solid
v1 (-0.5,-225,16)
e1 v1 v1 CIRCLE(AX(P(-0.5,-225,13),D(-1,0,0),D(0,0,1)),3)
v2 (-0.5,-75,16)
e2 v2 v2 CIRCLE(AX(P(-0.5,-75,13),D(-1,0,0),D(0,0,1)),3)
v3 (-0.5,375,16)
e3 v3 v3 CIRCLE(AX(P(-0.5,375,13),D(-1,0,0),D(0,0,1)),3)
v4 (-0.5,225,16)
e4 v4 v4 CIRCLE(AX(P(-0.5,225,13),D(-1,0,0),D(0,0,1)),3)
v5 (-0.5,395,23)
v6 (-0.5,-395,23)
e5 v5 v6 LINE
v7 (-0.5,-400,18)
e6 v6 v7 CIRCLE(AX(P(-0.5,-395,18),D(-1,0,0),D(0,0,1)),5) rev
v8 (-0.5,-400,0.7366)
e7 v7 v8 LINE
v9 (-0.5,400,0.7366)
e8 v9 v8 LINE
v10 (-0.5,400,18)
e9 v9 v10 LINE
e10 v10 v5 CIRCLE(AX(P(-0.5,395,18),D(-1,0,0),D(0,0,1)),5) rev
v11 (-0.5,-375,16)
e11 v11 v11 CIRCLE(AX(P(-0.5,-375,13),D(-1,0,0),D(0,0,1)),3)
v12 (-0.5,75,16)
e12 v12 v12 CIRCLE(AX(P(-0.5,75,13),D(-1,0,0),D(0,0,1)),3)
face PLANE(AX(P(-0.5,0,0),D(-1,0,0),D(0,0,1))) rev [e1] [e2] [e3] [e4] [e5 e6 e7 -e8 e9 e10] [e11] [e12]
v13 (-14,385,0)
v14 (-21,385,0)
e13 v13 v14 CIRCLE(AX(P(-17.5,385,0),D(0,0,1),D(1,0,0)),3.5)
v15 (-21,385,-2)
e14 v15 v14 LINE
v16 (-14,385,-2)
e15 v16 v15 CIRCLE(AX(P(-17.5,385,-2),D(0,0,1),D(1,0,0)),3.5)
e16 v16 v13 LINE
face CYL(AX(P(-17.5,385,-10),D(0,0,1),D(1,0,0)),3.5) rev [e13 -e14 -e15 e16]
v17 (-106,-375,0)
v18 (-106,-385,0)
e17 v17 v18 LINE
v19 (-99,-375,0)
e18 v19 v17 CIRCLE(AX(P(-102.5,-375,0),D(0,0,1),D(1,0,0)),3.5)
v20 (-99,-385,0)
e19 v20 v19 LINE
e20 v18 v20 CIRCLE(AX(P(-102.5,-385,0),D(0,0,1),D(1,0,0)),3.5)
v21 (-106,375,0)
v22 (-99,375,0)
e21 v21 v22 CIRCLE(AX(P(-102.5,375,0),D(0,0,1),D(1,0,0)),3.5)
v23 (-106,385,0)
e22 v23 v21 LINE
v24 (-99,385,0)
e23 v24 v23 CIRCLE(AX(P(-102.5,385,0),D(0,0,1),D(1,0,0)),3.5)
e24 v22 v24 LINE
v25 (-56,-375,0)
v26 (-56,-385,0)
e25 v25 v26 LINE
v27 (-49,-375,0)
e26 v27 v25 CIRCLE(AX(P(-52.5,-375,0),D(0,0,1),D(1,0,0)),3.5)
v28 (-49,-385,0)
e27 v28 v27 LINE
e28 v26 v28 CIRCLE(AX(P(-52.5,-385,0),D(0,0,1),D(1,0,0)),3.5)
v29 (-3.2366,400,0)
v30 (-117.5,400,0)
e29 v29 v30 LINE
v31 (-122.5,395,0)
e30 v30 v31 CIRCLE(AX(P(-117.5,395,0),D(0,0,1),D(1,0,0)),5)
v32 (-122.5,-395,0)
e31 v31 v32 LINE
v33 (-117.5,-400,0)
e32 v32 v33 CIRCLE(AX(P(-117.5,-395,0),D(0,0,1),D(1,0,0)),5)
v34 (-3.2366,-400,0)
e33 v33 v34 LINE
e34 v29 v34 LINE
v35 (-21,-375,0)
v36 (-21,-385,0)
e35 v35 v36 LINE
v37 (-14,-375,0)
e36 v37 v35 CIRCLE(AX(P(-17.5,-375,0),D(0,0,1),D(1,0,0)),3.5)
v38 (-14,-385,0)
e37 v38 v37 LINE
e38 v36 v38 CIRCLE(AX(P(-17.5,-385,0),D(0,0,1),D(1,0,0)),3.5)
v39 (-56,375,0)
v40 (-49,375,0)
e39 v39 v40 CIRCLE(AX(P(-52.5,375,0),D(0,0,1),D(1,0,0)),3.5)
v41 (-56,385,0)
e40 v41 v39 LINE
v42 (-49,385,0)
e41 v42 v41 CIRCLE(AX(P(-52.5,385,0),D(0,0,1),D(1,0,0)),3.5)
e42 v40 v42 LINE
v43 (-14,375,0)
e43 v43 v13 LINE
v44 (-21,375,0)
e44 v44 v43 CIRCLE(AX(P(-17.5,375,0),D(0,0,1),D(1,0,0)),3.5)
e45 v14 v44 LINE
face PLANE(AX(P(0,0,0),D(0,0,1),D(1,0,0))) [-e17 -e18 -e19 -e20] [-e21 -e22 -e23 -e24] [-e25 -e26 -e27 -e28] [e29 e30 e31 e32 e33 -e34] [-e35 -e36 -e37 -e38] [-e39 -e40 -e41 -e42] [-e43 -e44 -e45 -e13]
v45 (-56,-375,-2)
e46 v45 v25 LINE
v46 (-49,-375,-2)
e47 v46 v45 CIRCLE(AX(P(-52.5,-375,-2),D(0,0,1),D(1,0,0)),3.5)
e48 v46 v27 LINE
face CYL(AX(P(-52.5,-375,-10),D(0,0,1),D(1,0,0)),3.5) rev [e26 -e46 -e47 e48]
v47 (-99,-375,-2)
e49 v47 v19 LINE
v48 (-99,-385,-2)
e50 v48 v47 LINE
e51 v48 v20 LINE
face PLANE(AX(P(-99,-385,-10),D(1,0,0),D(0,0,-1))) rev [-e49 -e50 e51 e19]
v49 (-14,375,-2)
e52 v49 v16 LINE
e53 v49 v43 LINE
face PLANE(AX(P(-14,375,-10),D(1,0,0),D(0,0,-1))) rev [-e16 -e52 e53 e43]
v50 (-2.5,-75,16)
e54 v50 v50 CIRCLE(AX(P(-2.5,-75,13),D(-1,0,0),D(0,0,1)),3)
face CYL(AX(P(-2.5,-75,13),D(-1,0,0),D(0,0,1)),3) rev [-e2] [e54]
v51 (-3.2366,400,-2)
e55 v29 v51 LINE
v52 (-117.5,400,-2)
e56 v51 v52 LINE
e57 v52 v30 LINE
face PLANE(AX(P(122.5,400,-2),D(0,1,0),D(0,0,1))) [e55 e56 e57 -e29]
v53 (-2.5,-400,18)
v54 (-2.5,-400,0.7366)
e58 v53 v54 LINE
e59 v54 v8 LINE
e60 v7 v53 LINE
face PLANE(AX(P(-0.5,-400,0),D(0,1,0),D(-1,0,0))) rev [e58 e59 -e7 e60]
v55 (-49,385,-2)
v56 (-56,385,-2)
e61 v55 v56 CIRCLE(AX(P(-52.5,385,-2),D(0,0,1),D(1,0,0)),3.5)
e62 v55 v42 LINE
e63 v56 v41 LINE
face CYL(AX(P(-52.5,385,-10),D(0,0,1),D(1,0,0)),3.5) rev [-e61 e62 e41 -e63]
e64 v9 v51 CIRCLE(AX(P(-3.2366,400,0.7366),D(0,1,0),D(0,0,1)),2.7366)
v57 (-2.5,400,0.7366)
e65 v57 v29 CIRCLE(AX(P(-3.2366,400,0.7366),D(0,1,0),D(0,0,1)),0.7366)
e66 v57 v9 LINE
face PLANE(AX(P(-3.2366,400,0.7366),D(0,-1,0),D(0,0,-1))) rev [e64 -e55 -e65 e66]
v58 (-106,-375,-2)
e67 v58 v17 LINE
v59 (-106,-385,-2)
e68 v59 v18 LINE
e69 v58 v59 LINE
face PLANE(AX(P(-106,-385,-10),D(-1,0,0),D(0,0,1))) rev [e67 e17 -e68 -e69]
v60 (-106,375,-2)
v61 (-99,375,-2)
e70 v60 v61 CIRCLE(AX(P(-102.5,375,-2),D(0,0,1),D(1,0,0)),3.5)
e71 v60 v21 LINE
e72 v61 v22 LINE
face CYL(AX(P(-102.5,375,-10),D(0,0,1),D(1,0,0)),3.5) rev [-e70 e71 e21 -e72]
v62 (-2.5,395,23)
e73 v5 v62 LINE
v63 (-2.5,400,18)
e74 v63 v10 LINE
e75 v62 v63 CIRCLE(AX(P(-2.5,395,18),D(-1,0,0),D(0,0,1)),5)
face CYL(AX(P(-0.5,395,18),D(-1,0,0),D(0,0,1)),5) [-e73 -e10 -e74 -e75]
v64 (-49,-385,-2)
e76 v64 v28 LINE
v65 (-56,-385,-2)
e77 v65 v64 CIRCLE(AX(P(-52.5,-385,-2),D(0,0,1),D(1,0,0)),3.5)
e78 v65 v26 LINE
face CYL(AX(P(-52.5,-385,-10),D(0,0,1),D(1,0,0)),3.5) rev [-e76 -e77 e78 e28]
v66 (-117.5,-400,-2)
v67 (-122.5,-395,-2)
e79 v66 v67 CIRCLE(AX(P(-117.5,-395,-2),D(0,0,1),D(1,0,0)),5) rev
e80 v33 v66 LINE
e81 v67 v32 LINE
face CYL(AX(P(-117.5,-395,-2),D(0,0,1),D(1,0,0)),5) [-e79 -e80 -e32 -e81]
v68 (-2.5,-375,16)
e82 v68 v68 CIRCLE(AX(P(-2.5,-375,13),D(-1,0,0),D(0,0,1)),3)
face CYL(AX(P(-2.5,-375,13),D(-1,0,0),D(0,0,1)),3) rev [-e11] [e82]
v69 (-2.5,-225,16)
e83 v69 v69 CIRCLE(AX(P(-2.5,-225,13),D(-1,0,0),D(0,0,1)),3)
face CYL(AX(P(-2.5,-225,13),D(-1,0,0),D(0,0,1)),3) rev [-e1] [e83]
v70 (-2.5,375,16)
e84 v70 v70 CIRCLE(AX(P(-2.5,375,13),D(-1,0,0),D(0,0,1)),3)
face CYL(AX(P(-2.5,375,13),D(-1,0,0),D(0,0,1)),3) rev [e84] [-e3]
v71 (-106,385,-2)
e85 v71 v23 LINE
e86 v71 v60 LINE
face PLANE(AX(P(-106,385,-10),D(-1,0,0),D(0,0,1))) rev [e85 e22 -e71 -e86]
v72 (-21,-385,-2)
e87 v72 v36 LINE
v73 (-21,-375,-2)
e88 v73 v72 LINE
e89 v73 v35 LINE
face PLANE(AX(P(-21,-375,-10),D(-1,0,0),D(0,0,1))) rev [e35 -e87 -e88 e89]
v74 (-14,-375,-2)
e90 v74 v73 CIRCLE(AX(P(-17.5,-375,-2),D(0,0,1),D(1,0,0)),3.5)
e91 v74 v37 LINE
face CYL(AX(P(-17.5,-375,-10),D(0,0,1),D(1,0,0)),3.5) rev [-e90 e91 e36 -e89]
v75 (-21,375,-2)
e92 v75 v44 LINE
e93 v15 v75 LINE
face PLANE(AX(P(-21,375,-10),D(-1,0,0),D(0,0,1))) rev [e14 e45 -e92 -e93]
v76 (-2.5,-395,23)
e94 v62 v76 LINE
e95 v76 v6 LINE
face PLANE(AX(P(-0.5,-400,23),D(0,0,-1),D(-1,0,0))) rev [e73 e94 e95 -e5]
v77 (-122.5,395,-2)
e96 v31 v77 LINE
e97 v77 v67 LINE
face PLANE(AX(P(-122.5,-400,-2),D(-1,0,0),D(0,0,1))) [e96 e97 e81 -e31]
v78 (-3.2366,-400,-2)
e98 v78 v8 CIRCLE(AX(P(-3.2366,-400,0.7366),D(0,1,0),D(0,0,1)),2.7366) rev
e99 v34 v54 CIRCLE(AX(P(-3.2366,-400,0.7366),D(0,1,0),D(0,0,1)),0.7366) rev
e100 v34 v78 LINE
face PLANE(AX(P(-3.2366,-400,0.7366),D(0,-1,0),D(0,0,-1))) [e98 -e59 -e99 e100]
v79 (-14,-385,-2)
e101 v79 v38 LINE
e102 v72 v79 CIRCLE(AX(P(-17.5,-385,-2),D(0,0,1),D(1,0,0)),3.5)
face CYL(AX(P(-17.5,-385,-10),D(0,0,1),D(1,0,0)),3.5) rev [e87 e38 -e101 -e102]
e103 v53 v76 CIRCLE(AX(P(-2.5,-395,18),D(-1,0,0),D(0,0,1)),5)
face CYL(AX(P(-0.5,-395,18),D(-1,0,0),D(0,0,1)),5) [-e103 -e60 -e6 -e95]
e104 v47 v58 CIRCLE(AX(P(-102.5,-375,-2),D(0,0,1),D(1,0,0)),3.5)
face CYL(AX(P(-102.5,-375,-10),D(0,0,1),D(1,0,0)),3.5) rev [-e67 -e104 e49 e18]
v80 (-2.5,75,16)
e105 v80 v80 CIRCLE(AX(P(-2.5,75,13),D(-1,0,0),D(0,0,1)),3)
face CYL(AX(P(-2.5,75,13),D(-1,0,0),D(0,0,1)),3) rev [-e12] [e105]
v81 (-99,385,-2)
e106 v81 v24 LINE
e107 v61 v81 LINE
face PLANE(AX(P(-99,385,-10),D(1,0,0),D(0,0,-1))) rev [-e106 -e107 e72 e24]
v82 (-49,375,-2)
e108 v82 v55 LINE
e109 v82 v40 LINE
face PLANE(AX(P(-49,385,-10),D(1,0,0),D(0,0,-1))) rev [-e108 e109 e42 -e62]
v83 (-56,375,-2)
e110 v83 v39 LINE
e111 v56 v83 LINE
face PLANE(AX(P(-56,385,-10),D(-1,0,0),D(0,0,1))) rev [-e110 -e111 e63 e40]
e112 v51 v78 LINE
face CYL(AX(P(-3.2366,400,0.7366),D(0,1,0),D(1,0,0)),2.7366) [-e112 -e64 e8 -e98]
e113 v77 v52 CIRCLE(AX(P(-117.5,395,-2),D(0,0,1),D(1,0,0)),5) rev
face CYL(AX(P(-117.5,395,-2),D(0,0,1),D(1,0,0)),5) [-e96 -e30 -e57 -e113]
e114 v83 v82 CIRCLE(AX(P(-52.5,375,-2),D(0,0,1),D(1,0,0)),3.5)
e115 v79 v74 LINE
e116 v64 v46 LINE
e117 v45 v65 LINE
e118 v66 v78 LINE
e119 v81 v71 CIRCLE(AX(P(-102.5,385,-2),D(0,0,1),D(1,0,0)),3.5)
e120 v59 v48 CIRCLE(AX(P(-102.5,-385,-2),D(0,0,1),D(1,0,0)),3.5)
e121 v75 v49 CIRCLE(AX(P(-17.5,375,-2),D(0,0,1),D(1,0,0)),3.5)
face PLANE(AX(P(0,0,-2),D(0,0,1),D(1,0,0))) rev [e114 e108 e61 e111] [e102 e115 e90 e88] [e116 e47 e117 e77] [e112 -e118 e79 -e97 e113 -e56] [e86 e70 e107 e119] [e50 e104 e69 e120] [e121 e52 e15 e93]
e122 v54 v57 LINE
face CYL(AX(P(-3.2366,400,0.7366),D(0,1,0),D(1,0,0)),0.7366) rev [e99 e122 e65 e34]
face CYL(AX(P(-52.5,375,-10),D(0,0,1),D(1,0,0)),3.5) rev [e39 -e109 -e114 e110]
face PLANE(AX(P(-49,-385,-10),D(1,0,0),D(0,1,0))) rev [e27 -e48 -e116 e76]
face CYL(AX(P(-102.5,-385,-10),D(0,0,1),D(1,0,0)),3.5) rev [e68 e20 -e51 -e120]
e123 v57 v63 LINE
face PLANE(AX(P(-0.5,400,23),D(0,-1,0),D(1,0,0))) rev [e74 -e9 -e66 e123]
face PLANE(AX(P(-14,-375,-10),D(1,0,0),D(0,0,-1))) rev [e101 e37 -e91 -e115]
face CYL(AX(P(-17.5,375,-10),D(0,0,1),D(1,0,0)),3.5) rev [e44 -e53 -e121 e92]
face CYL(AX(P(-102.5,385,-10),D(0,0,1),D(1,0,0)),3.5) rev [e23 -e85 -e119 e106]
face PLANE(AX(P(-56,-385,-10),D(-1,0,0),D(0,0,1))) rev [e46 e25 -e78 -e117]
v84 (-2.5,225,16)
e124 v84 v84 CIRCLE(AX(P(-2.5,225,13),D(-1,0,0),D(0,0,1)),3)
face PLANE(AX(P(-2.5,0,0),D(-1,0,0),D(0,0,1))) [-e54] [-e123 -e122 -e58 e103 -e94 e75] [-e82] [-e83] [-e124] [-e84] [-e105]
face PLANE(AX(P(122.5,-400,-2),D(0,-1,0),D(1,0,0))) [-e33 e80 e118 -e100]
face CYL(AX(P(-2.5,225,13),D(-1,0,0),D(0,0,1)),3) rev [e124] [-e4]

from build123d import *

# Parameters (mm, degrees)
SKETCH_1_W                       = 245
SKETCH_1_H                       = 800
SM_BASE_FLANGE_1_DEPTH           = 2
FILLET_1_R                       = 5
SKETCH_2_W                       = 1
SKETCH_2_H                       = 854.013811654
CUT_EXTRUDE_1_DEPTH              = 10
SKETCH_3_W                       = 130
SKETCH_3_H                       = 800.320249097
CUT_EXTRUDE_2_DEPTH              = 10
SM_EDGE_FLANGE_1_STRIP_W         = 9.4732
SM_EDGE_FLANGE_1_STRIP_H         = 2
SM_EDGE_FLANGE_1_STRIP_CUT_DEPTH = 800
SM_EDGE_FLANGE_1_DEPTH           = 800
FILLET_2_R                       = 5
CUT_EXTRUDE_3_DEPTH              = 10
HOLE_WIZARD_6_0_6_1_D            = 6
PATTERN_LINEAR_1_COUNT           = 6
PATTERN_LINEAR_1_PITCH           = 150


# Sheet-metal steps are written as plain solids
with BuildPart() as part:
    # Sketch 1 → 基体-法兰1 (new body)
    with BuildSketch(Plane.XY):
        Rectangle(SKETCH_1_W, SKETCH_1_H)
    extrude(amount=-SM_BASE_FLANGE_1_DEPTH)

    # 圆角1
    fillet_1_edges = [part.edges().sort_by_distance(p)[0] for p in [
        (-122.5, 400, -1),
        (122.5, 400, -1),
        (122.5, -400, -1),
        (-122.5, -400, -1),
    ]]
    fillet(fillet_1_edges, radius=FILLET_1_R)

    # Sketch 2 → 切除-拉伸1 (cut)
    with BuildSketch(Plane.XY):
        Rectangle(SKETCH_2_W, SKETCH_2_H)
    extrude(amount=-CUT_EXTRUDE_1_DEPTH, mode=Mode.SUBTRACT)


with BuildPart() as cut_extrude_1_piece_1:
    # of the separate pieces the step leaves, piece 1, a body of its own (cut_extrude_1_pieces)
    add(part.part.solids().sort_by_distance((-0.5, -400, 0))[0])

    # 边线-法兰1 strip (across the edge) → 边线-法兰1 strip cut (cut)
    with BuildSketch(Plane(origin=(-0.5, -400, 0), x_dir=(-1, 0, 0), z_dir=(0, 1, 0))):
        with Locations((-2, -1)):
            Rectangle(SM_EDGE_FLANGE_1_STRIP_W, SM_EDGE_FLANGE_1_STRIP_H)
    extrude(amount=SM_EDGE_FLANGE_1_STRIP_CUT_DEPTH, mode=Mode.SUBTRACT)

    # 边线-法兰1 section (across the edge) → 边线-法兰1 (add)
    with BuildSketch(Plane(origin=(-0.5, -400, 0), x_dir=(-1, 0, 0), z_dir=(0, 1, 0))):
        with BuildLine():
            Line((0, 0.7366), (0, 23))
            Line((0, 23), (2, 23))
            Line((2, 23), (2, 0.7366))
            ThreePointArc((2, 0.7366), (2.215745145, 0.215745145), (2.7366, 0))
            Line((2.7366, 0), (2.7366, -2))
            ThreePointArc((2.7366, -2), (0.801531583, -1.198468417), (0, 0.7366))
        make_face()
    extrude(amount=SM_EDGE_FLANGE_1_DEPTH)

    # 圆角2
    fillet_2_edges = [cut_extrude_1_piece_1.edges().sort_by_distance(p)[0] for p in [
        (-1.5, -400, 23),
        (-1.5, 400, 23),
    ]]
    fillet(fillet_2_edges, radius=FILLET_2_R)

    # 草图9 → 切除-拉伸3 (cut)
    with BuildSketch(Plane.XY):
        with BuildLine():
            Line((-99, 385), (-99, 375))
            ThreePointArc((-99, 375), (-102.5, 371.5), (-106, 375))
            Line((-106, 375), (-106, 385))
            ThreePointArc((-106, 385), (-102.5, 388.5), (-99, 385))
        make_face()
        with BuildLine():
            Line((-49, 385), (-49, 375))
            ThreePointArc((-49, 375), (-52.5, 371.5), (-56, 375))
            Line((-56, 375), (-56, 385))
            ThreePointArc((-56, 385), (-52.5, 388.5), (-49, 385))
        make_face()
        with BuildLine():
            Line((-106, -385), (-106, -375))
            ThreePointArc((-106, -375), (-102.5, -371.5), (-99, -375))
            Line((-99, -375), (-99, -385))
            ThreePointArc((-99, -385), (-102.5, -388.5), (-106, -385))
        make_face()
        with BuildLine():
            Line((-21, 375), (-21, 385))
            ThreePointArc((-21, 385), (-17.5, 388.5), (-14, 385))
            Line((-14, 385), (-14, 375))
            ThreePointArc((-14, 375), (-17.5, 371.5), (-21, 375))
        make_face()
        with BuildLine():
            Line((-14, -375), (-14, -385))
            ThreePointArc((-14, -385), (-17.5, -388.5), (-21, -385))
            Line((-21, -385), (-21, -375))
            ThreePointArc((-21, -375), (-17.5, -371.5), (-14, -375))
        make_face()
        with BuildLine():
            Line((-56, -385), (-56, -375))
            ThreePointArc((-56, -375), (-52.5, -371.5), (-49, -375))
            Line((-49, -375), (-49, -385))
            ThreePointArc((-49, -385), (-52.5, -388.5), (-56, -385))
        make_face()
    extrude(amount=-CUT_EXTRUDE_3_DEPTH, mode=Mode.SUBTRACT)

    # Ø6.0 (6) 直径孔1 (through all)
    with Locations(Plane.ZY.offset(2.5)):
        with Locations((13, 375)):
            hole_wizard_6_0_6_1 = Hole(HOLE_WIZARD_6_0_6_1_D / 2)

    # 阵列(线性)1: Ø6.0 (6) 直径孔1 ×6
    with Locations(*[(0, -i * PATTERN_LINEAR_1_PITCH, 0) for i in range(1, PATTERN_LINEAR_1_COUNT)]):
        add(hole_wizard_6_0_6_1, mode=Mode.SUBTRACT)


with BuildPart() as cut_extrude_1_piece_2:
    # of the separate pieces the step leaves, piece 2, a body of its own (cut_extrude_1_pieces)
    add(part.part.solids().sort_by_distance((117.5, -400, 0))[0])

    # Sketch 3 → 切除-拉伸2 (cut)
    with BuildSketch(Plane.XY):
        with Locations((65.5, -0.160124549)):
            Rectangle(SKETCH_3_W, SKETCH_3_H)
    extrude(amount=-CUT_EXTRUDE_2_DEPTH, mode=Mode.SUBTRACT)


solid = cut_extrude_1_piece_1.part
